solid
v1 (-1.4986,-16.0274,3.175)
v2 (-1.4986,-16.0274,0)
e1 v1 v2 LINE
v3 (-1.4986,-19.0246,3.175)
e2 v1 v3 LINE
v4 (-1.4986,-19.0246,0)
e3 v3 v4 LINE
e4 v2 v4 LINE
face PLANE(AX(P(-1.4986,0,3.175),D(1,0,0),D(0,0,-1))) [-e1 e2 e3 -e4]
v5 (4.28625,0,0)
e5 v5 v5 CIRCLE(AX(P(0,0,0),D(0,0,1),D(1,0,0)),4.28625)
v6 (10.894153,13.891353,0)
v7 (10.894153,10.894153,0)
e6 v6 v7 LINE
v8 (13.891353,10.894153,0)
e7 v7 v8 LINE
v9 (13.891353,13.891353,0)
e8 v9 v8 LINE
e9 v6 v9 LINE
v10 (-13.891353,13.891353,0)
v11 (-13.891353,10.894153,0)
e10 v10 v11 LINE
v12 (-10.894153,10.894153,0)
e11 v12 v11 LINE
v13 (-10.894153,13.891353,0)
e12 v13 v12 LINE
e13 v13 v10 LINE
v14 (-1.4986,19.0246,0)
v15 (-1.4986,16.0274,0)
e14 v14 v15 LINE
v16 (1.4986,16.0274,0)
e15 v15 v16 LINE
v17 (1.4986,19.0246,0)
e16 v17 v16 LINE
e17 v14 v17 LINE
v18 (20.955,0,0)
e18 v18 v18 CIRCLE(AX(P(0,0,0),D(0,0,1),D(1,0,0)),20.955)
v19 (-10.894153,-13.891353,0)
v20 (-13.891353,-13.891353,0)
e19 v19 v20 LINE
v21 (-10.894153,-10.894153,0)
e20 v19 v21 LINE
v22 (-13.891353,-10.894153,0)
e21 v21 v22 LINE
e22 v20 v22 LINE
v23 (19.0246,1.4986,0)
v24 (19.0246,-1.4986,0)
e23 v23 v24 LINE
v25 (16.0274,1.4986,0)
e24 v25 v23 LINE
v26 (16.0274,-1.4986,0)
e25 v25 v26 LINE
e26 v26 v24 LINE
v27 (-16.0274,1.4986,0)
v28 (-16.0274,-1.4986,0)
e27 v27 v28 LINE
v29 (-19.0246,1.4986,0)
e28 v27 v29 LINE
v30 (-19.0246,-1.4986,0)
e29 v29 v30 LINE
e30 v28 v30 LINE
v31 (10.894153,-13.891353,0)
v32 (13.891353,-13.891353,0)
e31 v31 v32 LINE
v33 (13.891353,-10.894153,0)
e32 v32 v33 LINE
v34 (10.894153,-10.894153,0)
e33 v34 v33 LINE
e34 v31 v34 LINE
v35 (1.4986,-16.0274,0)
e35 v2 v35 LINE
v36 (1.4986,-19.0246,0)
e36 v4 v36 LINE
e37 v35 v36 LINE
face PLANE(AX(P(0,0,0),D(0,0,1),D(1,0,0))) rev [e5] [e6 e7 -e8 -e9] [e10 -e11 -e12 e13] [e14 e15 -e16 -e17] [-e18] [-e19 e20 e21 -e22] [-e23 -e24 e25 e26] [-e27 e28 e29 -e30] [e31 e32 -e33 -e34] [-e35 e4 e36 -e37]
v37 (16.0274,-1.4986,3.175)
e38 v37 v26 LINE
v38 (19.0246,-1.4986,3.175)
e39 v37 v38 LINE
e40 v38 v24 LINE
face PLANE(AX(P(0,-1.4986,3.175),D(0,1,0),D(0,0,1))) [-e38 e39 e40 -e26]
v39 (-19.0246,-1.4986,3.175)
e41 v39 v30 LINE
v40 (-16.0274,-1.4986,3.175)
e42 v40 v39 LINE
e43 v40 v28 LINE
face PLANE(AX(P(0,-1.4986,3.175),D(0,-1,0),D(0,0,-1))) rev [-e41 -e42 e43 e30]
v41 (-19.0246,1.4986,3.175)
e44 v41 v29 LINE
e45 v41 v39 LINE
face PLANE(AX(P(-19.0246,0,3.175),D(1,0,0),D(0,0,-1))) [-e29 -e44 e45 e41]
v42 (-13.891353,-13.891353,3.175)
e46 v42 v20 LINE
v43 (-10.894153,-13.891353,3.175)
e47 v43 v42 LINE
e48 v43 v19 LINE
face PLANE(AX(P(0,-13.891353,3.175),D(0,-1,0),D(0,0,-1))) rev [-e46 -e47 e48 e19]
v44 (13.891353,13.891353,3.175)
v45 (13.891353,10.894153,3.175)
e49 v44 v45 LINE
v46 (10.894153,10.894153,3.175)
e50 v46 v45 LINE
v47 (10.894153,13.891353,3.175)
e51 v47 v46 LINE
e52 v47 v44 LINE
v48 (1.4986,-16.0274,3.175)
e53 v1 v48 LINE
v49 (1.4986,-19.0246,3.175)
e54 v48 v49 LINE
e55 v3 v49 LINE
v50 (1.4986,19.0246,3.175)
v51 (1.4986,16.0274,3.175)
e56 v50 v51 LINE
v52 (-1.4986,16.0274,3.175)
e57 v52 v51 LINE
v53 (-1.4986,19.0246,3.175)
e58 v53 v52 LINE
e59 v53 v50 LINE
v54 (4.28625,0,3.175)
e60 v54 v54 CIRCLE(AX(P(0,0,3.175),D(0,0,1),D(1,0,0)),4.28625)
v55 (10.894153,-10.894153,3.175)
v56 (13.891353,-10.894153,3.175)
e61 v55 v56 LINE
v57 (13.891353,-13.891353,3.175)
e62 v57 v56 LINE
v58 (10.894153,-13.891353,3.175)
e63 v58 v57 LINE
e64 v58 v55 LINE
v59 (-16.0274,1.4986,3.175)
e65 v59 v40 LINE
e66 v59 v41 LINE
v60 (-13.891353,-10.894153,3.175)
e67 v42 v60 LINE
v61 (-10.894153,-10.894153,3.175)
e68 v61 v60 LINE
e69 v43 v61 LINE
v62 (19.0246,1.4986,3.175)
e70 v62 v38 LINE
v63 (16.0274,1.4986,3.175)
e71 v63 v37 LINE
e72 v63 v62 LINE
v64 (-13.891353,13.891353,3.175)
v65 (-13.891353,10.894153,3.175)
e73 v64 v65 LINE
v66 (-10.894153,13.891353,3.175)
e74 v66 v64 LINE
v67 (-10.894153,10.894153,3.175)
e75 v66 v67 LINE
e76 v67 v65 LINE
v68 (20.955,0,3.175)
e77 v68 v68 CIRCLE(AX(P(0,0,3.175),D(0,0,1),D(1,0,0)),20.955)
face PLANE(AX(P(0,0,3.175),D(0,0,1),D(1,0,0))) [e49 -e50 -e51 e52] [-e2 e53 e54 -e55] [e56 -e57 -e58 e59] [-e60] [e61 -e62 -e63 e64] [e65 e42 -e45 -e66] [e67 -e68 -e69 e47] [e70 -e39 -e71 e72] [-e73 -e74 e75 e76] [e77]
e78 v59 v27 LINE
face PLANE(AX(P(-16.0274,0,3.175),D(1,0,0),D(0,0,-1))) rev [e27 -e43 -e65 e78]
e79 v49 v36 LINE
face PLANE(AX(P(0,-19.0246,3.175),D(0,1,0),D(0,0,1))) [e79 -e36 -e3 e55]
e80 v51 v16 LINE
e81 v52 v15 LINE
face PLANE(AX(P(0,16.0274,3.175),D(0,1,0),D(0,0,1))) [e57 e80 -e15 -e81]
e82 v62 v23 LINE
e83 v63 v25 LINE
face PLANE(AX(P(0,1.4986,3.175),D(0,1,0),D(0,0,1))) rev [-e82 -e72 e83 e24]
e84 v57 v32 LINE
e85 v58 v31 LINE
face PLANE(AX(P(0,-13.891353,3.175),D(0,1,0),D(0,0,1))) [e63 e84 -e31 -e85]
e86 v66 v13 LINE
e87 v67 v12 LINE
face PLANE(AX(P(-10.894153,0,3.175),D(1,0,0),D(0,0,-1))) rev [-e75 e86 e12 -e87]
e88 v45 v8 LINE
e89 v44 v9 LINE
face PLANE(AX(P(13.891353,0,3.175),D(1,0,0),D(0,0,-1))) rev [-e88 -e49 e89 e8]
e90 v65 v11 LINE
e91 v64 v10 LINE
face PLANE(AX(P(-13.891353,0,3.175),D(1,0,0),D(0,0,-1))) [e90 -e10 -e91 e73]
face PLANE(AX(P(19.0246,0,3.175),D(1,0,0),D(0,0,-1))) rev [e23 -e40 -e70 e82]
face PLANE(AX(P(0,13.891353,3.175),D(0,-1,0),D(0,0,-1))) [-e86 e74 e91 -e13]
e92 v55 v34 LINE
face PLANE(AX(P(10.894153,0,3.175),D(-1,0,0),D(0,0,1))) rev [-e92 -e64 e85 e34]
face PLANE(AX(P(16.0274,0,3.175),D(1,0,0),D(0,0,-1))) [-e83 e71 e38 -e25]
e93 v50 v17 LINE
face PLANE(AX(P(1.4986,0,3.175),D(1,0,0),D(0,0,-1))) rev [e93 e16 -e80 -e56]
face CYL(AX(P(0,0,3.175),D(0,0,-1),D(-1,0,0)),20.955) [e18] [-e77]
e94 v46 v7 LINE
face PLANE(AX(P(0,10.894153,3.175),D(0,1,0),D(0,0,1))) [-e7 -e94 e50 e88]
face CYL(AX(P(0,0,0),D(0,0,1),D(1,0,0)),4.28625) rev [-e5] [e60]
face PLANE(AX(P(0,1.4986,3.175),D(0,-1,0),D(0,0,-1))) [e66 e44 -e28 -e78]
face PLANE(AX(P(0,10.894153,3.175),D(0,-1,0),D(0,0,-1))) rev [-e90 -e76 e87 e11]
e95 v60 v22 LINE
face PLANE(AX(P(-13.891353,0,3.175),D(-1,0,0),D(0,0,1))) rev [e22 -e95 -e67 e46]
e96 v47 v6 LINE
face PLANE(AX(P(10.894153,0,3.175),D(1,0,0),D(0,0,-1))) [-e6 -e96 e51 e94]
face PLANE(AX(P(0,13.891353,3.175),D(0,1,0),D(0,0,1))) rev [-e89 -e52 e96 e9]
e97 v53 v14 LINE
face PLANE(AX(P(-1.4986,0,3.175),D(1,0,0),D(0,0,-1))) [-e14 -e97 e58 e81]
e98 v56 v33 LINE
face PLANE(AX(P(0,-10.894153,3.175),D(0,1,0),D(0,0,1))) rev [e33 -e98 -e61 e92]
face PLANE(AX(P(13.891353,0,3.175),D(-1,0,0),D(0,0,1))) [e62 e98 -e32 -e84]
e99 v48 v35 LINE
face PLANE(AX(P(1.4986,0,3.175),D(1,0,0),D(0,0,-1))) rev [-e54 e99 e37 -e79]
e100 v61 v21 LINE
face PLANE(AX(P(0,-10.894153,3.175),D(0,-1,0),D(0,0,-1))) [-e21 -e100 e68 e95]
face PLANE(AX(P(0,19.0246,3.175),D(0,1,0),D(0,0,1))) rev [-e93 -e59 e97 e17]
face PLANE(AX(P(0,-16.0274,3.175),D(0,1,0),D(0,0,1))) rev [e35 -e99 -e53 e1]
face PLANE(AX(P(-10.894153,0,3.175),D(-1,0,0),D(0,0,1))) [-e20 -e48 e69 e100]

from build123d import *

# Parameters (mm, degrees)
SKETCH1_R              = 20.955
SKETCH1_W              = 2.9972
SKETCH1_H              = 2.9972
BOSS_EXTRUDE1_DEPTH    = 3.175
CUT_EXTRUDE1_OUTLINE_R = 4.28625
CUT_EXTRUDE1_DEPTH     = 3.175


# Read off the part's stored shape, not the designer's step: Cut-Extrude1
with BuildPart() as part:
    # Sketch1 → Boss-Extrude1 (new body)
    with BuildSketch(Plane.XY):
        Circle(SKETCH1_R)
        with Locations((0, 17.526)):
            Rectangle(SKETCH1_W, SKETCH1_H, mode=Mode.SUBTRACT)
        with Locations((0, -17.526)):
            Rectangle(SKETCH1_W, SKETCH1_H, mode=Mode.SUBTRACT)
        with Locations((-17.526, 0)):
            Rectangle(SKETCH1_W, SKETCH1_H, mode=Mode.SUBTRACT)
        with Locations((17.526, 0)):
            Rectangle(SKETCH1_W, SKETCH1_H, mode=Mode.SUBTRACT)
        with Locations((-12.392753447, 12.392753447)):
            Rectangle(SKETCH1_W, SKETCH1_H, mode=Mode.SUBTRACT)
        with Locations((12.392753447, 12.392753447)):
            Rectangle(SKETCH1_W, SKETCH1_H, mode=Mode.SUBTRACT)
        with Locations((-12.392753447, -12.392753447)):
            Rectangle(SKETCH1_W, SKETCH1_H, mode=Mode.SUBTRACT)
        with Locations((12.392753447, -12.392753447)):
            Rectangle(SKETCH1_W, SKETCH1_H, mode=Mode.SUBTRACT)
    extrude(amount=BOSS_EXTRUDE1_DEPTH)

    # Cut-Extrude1 outline → Cut-Extrude1 (cut)
    with BuildSketch(Plane.XY):
        Circle(CUT_EXTRUDE1_OUTLINE_R)
    extrude(amount=CUT_EXTRUDE1_DEPTH, mode=Mode.SUBTRACT)


solid = part.part
